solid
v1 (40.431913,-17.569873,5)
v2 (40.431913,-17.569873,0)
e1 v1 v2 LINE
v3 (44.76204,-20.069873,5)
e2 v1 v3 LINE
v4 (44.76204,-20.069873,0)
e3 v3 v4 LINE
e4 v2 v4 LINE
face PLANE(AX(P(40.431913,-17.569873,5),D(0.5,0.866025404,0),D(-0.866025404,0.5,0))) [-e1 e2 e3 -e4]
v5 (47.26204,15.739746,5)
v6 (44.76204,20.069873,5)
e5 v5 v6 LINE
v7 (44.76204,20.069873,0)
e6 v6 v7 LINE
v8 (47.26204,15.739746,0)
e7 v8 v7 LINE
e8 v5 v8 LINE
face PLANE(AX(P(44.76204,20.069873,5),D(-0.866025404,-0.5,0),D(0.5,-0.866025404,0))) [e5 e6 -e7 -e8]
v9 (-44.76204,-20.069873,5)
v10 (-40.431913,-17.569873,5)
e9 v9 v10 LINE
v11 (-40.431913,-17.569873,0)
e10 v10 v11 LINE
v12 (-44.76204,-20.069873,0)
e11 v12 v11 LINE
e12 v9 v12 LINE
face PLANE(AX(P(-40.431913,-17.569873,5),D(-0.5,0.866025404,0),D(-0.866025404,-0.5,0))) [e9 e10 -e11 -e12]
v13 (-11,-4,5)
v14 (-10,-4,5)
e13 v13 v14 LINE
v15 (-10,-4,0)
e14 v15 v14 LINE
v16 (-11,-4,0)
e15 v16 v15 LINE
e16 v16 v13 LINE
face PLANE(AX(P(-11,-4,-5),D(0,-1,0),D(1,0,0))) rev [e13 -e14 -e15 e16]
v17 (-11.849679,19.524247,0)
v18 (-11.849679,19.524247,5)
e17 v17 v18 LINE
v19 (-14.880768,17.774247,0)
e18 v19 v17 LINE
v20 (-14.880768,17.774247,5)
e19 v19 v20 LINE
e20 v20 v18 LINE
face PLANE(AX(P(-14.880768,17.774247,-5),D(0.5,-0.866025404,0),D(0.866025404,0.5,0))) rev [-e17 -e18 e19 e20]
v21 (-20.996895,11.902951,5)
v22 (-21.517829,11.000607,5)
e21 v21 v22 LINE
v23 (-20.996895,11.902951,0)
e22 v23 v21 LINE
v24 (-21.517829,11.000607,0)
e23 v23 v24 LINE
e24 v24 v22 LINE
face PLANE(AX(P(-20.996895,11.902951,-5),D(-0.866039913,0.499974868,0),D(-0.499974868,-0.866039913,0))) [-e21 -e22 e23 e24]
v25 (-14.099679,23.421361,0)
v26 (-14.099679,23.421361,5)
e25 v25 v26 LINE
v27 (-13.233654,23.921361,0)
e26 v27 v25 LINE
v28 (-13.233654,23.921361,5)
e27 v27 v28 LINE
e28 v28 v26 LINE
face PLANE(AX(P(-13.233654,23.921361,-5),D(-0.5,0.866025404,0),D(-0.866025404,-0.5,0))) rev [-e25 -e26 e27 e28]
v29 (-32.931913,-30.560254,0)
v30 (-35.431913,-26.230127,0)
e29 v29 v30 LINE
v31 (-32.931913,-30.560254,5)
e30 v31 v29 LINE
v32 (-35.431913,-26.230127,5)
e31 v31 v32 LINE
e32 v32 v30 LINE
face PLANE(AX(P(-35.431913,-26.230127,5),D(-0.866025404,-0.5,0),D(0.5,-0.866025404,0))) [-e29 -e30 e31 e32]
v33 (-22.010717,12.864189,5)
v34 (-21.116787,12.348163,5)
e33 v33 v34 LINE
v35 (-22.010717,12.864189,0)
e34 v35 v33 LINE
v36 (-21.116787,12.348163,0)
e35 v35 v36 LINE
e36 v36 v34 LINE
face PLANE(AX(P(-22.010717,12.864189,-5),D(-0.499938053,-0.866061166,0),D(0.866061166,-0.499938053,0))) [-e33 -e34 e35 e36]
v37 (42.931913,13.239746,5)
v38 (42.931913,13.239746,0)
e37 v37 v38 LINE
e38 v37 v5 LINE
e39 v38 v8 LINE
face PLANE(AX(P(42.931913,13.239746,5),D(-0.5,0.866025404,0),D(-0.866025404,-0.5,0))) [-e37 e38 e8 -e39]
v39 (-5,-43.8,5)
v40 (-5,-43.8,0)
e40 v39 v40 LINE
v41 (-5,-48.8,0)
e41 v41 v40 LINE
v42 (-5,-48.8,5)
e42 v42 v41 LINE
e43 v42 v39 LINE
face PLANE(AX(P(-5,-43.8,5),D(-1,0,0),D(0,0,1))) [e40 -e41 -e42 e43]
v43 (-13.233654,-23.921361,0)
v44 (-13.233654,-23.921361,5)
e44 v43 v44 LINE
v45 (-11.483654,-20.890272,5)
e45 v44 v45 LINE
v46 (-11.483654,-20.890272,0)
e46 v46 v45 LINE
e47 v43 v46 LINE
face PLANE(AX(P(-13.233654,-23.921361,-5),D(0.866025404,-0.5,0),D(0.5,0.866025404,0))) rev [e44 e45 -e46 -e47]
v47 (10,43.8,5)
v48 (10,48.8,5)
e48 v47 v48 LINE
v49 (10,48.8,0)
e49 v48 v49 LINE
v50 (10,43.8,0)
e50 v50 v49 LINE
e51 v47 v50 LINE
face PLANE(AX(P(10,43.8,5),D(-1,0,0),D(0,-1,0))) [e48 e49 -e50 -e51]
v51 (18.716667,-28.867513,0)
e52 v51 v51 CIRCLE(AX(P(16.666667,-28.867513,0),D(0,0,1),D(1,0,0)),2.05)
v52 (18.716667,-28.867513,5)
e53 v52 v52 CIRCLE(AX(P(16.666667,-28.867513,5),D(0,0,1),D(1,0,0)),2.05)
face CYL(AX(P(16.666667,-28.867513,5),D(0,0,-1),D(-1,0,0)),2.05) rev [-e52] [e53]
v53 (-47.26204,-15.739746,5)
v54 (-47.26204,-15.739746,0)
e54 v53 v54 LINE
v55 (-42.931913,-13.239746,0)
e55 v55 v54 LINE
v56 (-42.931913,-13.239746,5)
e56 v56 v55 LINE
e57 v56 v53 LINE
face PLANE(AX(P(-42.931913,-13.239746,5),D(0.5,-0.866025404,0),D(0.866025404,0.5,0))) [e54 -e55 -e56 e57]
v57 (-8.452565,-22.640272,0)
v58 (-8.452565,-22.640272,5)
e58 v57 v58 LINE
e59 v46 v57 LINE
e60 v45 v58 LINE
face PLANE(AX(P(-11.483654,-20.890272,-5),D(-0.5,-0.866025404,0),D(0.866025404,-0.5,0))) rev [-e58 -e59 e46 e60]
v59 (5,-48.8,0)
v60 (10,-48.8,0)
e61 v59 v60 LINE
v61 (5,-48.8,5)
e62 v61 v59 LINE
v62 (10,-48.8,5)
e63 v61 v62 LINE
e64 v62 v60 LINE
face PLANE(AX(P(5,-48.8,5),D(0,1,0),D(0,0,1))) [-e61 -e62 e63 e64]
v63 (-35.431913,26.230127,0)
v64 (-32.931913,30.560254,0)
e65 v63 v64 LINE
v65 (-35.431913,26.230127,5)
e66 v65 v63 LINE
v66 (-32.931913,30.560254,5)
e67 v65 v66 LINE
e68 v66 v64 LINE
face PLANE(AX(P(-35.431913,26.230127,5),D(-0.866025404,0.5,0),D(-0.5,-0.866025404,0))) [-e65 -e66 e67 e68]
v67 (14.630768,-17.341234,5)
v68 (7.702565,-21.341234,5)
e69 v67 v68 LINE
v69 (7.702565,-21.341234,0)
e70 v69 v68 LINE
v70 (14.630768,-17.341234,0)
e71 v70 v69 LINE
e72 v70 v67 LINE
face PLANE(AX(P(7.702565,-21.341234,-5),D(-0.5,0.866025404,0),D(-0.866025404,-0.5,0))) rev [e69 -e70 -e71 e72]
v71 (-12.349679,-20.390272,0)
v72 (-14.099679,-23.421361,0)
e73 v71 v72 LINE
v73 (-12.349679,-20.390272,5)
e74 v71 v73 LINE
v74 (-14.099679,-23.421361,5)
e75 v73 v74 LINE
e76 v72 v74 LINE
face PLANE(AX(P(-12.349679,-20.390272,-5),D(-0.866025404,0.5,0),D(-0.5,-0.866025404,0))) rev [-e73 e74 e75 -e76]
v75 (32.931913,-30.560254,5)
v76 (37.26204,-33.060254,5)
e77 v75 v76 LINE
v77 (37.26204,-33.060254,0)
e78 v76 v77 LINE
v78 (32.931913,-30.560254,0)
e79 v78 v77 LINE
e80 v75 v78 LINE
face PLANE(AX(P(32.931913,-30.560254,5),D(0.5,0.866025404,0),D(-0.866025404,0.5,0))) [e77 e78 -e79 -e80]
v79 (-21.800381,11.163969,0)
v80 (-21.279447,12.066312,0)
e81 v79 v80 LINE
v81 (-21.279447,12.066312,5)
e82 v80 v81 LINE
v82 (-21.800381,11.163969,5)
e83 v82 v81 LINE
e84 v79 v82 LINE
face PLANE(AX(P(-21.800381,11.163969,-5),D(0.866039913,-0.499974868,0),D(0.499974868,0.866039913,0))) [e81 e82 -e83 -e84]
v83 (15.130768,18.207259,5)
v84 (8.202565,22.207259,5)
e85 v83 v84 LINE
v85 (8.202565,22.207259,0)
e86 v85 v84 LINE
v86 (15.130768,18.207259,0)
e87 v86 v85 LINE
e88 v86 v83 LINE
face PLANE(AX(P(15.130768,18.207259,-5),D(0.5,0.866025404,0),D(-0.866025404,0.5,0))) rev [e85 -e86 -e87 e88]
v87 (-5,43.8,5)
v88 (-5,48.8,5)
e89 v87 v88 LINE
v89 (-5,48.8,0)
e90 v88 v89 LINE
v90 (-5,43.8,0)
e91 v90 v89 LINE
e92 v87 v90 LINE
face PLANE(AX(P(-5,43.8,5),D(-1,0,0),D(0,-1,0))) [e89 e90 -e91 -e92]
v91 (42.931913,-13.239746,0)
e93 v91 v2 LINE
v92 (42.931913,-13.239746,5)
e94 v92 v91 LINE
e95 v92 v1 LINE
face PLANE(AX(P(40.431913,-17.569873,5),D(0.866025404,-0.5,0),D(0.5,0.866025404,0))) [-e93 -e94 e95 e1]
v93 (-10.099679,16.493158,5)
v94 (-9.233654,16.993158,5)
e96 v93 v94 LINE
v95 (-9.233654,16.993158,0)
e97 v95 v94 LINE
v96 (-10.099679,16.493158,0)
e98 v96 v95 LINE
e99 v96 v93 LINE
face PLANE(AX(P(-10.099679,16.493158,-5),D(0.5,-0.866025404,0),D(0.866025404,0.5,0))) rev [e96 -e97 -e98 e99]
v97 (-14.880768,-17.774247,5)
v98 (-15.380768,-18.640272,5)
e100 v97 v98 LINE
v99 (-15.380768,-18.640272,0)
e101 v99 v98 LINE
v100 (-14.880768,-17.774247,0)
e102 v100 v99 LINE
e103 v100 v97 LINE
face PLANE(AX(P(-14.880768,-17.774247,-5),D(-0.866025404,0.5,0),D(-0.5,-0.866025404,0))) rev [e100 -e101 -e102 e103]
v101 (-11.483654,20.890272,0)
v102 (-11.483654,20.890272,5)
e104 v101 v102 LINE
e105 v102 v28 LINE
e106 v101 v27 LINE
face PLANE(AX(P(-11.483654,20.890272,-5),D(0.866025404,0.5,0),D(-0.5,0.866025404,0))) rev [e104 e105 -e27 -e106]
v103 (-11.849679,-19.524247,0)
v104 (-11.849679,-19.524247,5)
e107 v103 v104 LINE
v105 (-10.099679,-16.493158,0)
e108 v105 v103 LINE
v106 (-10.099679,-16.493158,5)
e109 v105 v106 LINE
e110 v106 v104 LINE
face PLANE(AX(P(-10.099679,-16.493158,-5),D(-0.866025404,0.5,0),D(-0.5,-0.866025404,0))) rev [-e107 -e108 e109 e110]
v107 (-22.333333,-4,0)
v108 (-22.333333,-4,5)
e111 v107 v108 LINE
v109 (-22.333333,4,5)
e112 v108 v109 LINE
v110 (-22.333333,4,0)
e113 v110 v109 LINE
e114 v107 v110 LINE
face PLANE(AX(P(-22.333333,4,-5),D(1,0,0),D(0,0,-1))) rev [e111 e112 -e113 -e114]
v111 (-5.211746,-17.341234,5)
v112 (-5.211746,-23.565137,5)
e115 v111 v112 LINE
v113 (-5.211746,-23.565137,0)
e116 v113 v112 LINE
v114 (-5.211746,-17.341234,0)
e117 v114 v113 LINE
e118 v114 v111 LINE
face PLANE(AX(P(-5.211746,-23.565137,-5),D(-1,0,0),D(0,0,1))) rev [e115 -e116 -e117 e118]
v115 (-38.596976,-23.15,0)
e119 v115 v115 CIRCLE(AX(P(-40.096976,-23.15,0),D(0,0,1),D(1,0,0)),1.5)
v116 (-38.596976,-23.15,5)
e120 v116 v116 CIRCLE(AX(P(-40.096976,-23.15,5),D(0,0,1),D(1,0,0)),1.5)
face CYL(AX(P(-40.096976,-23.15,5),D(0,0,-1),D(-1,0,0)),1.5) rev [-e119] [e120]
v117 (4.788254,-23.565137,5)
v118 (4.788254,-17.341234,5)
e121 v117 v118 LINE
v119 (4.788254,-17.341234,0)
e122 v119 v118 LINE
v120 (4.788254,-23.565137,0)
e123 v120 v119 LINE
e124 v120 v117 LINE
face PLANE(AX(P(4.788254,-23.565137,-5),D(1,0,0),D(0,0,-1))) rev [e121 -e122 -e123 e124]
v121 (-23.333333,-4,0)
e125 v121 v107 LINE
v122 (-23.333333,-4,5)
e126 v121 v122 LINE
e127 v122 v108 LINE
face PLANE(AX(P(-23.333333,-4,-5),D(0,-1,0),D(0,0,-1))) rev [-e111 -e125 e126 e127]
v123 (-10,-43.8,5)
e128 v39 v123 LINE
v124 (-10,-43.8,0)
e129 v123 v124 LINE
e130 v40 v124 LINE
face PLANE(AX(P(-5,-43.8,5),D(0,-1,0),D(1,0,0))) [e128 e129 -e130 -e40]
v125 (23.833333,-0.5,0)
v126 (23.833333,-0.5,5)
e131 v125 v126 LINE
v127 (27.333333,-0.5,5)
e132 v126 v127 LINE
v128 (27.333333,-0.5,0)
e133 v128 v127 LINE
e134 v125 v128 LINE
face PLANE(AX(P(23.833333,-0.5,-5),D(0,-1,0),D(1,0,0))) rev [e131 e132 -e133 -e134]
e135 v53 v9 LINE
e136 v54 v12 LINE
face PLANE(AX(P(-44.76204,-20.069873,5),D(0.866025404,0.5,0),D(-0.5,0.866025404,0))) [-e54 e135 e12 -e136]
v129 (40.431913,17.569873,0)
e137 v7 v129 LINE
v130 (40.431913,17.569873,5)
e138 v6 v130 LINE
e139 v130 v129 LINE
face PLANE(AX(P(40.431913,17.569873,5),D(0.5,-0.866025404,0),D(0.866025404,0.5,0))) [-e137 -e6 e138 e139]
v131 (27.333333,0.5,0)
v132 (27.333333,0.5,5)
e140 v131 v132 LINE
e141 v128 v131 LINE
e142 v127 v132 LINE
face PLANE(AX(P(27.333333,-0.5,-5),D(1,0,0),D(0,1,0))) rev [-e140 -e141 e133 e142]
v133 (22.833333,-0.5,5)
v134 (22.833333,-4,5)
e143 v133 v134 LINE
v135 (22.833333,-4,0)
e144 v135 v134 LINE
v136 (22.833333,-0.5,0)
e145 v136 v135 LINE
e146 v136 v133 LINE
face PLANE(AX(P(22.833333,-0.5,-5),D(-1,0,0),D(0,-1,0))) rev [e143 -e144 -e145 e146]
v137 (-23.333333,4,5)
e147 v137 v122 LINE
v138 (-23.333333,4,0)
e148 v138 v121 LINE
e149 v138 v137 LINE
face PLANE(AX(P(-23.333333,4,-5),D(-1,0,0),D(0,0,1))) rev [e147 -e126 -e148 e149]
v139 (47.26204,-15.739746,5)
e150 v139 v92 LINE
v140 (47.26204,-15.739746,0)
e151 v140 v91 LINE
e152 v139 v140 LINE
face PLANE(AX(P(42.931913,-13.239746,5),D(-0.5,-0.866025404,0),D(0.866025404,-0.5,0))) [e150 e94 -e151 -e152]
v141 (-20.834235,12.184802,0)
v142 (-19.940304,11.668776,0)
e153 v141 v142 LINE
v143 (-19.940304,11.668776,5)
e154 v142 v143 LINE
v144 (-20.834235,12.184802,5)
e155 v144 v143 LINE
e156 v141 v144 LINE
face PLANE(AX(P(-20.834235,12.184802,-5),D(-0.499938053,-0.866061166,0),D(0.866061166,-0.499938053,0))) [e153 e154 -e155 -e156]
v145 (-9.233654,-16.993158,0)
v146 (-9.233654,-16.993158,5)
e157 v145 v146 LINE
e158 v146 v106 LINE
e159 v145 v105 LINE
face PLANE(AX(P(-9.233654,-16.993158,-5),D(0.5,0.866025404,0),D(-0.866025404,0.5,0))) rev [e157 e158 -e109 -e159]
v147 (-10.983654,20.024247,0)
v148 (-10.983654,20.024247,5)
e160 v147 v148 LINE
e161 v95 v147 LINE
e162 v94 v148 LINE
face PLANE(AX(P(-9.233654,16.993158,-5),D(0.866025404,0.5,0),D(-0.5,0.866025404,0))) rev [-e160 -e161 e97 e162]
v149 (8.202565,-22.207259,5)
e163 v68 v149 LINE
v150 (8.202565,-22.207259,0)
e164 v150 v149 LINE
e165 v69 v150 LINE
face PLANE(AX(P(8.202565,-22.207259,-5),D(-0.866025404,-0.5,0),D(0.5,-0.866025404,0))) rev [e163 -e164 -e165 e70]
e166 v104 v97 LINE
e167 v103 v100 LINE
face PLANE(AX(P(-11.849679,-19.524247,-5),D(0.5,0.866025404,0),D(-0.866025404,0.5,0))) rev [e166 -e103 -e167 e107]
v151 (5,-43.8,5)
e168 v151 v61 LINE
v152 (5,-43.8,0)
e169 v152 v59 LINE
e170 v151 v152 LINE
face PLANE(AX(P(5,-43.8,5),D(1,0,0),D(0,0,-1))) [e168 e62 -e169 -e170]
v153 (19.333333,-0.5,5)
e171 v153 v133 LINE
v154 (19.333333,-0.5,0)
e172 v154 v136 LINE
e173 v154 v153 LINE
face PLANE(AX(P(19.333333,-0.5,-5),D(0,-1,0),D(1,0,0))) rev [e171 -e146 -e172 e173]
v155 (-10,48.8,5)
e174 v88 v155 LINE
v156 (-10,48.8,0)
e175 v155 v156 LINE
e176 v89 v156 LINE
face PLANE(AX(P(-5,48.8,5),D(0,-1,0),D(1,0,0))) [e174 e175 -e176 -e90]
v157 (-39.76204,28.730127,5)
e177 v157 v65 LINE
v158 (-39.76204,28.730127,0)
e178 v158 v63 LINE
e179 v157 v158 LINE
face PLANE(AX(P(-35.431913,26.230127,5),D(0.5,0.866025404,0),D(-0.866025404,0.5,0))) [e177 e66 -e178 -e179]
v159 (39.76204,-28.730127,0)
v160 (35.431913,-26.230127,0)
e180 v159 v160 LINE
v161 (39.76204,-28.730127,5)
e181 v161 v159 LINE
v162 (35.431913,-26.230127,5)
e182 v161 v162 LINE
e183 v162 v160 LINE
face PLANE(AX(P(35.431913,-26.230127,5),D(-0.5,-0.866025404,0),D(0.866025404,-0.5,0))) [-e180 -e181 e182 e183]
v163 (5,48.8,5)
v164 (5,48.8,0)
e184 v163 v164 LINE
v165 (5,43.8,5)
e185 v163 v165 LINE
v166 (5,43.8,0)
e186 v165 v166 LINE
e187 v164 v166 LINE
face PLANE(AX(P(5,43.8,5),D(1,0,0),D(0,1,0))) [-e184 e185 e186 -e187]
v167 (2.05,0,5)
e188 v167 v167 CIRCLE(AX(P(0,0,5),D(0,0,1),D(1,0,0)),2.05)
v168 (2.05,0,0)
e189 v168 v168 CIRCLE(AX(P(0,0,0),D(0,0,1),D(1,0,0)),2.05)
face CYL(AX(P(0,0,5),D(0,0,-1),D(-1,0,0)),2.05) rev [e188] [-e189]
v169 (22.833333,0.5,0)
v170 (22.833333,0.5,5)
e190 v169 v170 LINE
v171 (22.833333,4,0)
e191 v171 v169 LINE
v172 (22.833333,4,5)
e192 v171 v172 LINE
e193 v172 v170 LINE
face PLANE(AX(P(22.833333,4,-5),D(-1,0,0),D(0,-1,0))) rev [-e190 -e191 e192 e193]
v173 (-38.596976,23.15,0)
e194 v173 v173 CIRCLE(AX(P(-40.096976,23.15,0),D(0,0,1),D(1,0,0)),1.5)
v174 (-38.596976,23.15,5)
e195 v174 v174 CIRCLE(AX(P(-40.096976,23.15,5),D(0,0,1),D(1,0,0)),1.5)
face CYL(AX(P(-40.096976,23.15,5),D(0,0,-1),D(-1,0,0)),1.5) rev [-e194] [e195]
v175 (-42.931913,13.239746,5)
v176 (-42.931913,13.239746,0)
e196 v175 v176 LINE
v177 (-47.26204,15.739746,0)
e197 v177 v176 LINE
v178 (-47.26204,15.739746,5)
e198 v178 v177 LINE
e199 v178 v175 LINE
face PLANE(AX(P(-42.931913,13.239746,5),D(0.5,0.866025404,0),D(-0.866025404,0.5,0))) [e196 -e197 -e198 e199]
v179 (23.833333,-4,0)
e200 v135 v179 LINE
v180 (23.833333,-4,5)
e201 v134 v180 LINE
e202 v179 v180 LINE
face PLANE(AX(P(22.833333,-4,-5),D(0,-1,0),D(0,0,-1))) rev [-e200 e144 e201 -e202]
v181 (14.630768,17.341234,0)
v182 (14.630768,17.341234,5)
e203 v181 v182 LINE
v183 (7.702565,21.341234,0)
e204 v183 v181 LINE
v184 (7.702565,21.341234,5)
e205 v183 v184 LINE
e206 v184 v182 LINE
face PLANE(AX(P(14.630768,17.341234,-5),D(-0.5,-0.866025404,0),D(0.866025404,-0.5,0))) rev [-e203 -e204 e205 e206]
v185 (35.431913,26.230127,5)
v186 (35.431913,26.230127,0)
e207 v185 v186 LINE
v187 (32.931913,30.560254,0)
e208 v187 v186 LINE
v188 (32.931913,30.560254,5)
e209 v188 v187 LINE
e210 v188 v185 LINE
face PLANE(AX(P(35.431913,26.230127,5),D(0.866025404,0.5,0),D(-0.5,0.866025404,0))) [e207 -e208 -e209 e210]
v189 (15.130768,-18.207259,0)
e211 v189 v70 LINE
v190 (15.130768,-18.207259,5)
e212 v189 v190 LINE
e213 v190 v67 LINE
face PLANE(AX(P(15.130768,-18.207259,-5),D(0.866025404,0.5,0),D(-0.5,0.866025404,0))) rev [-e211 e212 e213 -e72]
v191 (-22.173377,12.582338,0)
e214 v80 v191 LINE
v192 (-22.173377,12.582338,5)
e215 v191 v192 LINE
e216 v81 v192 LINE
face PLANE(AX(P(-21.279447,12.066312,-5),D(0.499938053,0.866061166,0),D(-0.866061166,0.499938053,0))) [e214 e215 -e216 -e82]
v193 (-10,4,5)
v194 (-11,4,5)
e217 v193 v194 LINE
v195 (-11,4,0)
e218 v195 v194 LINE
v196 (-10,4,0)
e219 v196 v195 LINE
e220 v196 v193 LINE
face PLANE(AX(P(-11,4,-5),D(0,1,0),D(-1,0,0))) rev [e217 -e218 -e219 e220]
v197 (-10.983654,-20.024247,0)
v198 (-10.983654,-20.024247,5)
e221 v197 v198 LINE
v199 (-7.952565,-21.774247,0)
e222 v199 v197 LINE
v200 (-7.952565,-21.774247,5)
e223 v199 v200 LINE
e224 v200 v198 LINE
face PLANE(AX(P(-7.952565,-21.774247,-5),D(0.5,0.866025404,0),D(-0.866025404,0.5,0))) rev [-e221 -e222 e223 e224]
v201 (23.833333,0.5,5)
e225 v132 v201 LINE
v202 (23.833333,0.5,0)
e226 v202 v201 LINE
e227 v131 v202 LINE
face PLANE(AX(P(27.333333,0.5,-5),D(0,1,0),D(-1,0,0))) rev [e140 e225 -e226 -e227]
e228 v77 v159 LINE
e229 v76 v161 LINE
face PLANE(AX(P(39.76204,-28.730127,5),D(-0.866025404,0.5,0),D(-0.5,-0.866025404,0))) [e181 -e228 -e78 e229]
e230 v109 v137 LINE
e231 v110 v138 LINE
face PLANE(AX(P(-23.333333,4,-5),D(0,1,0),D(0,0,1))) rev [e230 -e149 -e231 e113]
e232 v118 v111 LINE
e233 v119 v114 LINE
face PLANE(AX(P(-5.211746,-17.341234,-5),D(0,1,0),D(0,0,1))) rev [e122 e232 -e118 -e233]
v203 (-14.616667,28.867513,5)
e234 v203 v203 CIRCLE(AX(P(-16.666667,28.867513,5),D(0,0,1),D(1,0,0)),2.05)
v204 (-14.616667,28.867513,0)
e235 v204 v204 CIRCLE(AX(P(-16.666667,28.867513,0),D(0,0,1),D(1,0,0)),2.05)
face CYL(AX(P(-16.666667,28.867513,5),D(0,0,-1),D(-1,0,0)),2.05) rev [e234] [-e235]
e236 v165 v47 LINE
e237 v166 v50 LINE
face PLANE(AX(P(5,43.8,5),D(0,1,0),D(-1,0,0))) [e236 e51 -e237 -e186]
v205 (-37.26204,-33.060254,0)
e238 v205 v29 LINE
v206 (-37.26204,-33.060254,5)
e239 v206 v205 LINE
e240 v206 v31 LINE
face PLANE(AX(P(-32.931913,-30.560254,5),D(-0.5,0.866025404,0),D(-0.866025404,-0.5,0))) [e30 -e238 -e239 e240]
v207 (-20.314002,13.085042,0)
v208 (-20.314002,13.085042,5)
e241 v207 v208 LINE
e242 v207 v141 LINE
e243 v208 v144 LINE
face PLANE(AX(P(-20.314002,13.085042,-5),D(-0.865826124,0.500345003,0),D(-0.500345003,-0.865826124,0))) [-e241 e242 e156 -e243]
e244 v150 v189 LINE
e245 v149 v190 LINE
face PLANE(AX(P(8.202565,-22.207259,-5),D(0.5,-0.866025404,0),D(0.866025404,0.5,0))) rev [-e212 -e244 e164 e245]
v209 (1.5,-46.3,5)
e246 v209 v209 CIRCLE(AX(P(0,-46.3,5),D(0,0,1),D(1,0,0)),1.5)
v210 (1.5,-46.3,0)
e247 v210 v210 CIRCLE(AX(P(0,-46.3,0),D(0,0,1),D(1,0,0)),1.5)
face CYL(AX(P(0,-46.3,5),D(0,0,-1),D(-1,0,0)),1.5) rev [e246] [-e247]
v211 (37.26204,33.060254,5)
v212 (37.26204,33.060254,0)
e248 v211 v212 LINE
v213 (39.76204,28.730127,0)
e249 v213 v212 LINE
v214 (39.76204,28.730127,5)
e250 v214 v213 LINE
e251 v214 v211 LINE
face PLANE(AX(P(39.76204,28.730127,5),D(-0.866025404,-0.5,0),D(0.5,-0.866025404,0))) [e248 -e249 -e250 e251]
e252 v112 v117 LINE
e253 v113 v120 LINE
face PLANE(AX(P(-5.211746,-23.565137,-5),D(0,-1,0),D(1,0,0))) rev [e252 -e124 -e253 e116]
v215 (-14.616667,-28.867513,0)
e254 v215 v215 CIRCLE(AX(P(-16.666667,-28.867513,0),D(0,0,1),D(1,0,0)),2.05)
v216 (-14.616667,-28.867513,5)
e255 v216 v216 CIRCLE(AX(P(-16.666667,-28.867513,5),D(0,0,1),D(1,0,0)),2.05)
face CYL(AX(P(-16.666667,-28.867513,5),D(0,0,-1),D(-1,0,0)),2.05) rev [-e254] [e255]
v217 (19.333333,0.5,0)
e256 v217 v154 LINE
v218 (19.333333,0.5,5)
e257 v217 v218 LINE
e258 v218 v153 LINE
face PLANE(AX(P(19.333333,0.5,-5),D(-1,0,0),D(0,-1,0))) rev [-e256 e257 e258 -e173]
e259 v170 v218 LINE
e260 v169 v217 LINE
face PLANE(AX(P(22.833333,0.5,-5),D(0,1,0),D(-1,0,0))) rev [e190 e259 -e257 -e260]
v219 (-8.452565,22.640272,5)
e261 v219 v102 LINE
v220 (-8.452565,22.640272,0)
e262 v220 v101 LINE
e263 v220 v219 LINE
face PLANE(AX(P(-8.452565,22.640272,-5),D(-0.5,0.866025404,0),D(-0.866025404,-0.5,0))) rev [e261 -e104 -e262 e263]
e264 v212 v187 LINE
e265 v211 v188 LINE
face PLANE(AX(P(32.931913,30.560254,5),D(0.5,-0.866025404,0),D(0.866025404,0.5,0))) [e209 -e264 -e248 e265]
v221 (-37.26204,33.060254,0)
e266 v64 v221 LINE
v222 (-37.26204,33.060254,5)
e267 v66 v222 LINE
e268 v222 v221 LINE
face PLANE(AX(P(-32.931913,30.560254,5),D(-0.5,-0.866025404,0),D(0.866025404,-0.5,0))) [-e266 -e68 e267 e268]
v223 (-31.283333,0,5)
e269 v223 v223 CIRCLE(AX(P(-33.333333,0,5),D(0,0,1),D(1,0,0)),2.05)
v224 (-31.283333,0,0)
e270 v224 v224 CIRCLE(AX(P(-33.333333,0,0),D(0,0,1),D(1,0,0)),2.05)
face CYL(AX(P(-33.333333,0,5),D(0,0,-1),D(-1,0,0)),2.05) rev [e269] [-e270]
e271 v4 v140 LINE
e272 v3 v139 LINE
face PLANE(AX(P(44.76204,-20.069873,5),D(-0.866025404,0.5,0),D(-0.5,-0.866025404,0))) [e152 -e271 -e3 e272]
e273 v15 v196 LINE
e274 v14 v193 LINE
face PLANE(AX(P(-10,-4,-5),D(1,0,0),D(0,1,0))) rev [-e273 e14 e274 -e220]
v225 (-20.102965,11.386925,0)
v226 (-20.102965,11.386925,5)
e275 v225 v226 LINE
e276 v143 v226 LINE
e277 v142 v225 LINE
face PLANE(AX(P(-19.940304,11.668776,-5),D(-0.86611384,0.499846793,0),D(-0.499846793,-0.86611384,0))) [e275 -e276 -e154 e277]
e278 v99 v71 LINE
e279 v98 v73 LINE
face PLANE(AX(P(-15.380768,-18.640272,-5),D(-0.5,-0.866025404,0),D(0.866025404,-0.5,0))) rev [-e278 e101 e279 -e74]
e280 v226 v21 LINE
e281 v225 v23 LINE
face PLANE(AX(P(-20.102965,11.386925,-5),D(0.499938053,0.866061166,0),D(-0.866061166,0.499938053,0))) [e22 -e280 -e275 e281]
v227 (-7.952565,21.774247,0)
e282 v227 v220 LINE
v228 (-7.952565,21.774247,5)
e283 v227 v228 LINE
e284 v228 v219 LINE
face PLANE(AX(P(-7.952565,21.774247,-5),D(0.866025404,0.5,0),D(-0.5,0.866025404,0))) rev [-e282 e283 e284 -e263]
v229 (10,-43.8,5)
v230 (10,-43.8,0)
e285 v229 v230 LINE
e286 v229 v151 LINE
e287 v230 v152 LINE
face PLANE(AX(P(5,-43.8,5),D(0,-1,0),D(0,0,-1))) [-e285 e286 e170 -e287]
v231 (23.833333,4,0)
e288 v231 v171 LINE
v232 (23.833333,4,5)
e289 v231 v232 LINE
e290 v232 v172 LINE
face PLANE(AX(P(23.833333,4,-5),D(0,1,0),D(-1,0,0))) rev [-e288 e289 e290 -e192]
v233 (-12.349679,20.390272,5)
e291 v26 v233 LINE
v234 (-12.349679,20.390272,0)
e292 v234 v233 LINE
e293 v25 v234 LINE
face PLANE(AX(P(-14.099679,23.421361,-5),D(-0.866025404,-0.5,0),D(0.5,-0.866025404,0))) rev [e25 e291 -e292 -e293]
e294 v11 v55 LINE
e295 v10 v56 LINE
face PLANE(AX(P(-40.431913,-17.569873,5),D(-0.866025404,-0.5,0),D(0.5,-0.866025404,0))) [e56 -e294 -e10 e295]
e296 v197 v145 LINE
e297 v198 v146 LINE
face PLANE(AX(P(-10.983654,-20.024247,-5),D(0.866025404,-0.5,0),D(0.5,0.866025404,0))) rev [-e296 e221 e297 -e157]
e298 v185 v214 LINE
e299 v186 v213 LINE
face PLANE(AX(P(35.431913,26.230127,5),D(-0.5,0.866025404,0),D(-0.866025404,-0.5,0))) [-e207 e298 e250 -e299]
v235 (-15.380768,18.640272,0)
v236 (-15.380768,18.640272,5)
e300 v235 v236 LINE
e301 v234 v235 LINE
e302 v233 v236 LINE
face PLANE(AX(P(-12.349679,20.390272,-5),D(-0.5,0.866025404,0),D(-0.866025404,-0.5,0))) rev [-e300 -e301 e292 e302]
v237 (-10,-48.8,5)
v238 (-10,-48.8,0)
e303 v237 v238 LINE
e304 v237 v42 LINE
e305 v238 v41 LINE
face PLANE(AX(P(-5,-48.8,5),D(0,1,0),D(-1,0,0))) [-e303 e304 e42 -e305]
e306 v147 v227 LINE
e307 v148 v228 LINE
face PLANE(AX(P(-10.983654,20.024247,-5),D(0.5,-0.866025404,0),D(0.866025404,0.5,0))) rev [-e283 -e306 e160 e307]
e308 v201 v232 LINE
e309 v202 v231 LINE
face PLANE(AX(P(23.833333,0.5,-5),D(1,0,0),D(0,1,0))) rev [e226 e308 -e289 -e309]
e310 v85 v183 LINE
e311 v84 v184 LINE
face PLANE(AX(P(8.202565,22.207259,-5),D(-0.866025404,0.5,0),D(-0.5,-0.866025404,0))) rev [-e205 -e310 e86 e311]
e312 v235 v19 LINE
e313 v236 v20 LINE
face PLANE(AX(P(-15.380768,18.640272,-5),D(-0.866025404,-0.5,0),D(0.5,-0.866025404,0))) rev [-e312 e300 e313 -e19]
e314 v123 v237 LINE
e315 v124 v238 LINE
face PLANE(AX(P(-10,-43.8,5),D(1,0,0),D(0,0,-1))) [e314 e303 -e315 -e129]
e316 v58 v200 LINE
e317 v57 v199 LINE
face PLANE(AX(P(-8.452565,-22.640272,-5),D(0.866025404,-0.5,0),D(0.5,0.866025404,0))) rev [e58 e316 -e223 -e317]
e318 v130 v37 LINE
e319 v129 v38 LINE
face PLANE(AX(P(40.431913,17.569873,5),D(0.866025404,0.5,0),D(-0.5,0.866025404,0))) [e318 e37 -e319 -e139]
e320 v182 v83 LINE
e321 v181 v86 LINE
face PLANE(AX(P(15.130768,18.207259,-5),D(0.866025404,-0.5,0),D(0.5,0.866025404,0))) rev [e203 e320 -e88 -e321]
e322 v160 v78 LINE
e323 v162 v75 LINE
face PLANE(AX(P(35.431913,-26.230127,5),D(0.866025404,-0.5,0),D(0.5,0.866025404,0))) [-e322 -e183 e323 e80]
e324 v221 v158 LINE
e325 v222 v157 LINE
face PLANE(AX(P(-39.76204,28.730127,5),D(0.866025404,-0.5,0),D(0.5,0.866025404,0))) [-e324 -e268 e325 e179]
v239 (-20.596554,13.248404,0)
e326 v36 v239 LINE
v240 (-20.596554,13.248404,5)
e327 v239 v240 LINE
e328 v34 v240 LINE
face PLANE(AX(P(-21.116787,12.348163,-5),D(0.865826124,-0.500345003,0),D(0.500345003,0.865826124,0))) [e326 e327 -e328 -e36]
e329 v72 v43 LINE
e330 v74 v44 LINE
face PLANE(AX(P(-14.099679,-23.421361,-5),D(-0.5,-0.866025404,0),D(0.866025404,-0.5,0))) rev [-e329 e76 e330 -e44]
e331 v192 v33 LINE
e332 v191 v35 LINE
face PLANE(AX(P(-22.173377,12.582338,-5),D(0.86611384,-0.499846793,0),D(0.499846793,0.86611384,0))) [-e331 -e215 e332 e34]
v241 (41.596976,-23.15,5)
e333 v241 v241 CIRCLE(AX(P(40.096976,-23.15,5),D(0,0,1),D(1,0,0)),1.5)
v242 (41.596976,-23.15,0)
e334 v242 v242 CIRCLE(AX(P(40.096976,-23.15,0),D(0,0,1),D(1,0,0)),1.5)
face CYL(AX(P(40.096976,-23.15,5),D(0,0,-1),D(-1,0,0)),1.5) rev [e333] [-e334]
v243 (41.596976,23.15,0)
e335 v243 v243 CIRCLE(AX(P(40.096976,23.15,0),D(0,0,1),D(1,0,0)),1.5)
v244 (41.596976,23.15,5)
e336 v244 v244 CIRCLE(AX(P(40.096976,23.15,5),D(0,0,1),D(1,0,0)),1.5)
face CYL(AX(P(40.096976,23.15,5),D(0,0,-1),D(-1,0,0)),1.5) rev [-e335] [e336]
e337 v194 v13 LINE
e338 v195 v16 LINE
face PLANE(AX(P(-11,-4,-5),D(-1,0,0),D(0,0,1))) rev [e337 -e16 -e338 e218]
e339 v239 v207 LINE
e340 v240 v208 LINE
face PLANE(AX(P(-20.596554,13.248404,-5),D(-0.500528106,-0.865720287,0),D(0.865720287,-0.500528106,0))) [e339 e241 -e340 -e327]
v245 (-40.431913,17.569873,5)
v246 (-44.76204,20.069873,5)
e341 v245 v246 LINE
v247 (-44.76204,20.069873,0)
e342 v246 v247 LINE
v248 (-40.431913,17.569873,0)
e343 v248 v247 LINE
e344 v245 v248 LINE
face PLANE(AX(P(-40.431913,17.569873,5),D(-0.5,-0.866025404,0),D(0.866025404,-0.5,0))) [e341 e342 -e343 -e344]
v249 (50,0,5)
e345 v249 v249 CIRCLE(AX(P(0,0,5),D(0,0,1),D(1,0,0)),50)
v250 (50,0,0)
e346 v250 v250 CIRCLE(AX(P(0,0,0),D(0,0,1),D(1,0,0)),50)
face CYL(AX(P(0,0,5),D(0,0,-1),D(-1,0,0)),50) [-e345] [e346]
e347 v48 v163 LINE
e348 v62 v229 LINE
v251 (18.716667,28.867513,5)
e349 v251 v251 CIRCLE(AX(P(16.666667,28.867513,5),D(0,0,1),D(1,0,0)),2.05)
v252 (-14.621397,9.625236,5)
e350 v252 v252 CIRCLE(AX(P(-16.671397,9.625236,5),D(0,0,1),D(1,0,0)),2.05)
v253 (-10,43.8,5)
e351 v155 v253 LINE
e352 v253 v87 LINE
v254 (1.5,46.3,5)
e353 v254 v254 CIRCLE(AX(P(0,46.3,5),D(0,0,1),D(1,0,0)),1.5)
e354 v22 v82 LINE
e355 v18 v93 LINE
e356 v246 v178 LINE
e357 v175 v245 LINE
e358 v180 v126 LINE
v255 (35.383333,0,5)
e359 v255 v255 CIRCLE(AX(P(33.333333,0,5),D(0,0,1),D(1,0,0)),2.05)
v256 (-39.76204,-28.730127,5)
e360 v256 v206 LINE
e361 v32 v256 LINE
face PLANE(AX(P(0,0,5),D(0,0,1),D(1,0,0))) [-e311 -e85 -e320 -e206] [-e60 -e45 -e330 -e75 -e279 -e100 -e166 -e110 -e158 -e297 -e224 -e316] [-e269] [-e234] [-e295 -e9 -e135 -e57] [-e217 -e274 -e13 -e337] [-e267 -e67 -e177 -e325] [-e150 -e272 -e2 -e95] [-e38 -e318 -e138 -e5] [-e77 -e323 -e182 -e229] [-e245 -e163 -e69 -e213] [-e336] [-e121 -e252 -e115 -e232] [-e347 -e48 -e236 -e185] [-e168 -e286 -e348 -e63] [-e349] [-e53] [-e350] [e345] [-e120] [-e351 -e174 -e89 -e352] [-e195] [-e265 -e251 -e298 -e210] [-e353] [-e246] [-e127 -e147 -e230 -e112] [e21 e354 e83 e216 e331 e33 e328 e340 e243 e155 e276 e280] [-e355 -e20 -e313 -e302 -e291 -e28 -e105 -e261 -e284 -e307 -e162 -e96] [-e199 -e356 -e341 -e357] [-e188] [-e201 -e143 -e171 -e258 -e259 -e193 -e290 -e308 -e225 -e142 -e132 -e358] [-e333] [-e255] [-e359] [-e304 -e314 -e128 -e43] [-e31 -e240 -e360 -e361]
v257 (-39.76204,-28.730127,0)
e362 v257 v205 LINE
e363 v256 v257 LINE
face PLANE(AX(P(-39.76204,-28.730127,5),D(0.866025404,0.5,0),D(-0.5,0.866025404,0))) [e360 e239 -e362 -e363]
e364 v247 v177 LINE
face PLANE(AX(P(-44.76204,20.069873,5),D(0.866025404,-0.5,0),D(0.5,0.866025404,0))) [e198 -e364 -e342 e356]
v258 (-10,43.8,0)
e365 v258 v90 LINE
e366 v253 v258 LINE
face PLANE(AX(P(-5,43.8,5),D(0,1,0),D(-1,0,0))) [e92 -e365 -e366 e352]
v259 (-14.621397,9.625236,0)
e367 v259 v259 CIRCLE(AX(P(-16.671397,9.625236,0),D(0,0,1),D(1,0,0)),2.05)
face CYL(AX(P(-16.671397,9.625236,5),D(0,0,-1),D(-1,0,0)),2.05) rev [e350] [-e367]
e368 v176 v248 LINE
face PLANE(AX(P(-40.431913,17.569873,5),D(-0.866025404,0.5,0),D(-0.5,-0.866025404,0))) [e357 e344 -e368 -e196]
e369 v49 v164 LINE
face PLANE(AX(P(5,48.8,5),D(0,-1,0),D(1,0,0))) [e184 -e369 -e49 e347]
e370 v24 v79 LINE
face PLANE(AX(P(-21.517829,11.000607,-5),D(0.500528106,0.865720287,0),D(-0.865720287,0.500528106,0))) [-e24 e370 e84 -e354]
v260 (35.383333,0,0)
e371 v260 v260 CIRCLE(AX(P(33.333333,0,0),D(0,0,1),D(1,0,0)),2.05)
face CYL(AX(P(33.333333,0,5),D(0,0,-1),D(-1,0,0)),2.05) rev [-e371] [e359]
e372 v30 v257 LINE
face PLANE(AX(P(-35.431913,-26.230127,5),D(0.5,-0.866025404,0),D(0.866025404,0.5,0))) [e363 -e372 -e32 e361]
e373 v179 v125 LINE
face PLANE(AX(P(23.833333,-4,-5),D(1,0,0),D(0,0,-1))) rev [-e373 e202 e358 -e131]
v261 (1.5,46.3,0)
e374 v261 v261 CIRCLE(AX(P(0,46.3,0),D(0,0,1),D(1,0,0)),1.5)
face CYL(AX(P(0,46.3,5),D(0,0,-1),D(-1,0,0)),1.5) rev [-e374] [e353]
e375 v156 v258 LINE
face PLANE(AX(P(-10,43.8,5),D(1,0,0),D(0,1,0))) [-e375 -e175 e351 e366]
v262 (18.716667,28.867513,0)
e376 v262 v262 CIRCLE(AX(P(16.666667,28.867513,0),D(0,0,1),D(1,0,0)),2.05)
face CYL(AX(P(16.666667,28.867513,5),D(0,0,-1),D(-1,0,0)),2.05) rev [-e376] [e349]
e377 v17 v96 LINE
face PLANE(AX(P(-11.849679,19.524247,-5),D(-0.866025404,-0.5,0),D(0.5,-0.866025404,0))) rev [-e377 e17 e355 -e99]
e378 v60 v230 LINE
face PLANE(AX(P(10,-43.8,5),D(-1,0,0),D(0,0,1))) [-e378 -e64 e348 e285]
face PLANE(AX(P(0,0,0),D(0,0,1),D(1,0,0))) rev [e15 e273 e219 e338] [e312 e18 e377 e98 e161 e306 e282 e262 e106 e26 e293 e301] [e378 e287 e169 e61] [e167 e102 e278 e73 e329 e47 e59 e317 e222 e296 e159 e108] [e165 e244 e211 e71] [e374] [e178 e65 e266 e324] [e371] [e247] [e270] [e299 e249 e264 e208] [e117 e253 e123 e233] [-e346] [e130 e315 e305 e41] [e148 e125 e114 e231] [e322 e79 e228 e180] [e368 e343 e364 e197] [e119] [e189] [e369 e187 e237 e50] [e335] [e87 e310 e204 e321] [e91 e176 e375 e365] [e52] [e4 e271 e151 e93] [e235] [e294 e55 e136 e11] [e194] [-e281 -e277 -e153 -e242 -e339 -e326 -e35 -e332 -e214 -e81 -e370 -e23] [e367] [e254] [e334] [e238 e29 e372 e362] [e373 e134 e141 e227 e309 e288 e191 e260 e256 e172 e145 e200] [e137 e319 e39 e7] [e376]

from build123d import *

# Parameters (mm, degrees)
BOSS_EXTRU_1_OUTLINE_R   = 50
BOSS_EXTRU_1_OUTLINE_W   = 5
BOSS_EXTRU_1_OUTLINE_H   = 5
BOSS_EXTRU_1_OUTLINE_R_2 = 2.05
BOSS_EXTRU_1_OUTLINE_R_3 = 1.5
BOSS_EXTRU_1_DEPTH       = 5
SKETCH3_W                = 1
SKETCH3_H                = 8
SKETCH3_W_2              = 10
SKETCH3_H_2              = 6.223903135
CUT_EXTRUDE2_DEPTH       = 10


# Read off the part's stored shape, not the designer's step: Boss.-Extru.1
with BuildPart() as part:
    # Boss.-Extru.1 outline → Boss.-Extru.1 (new body)
    with BuildSketch(Plane.XY):
        Circle(BOSS_EXTRU_1_OUTLINE_R)
        Polygon((-37.262039705, -33.060254038), (-39.762039705, -28.730127019), (-35.431912686, -26.230127019), (-32.931912686, -30.560254038), align=None, mode=Mode.SUBTRACT)
        with Locations((-7.5, -46.3)):
            Rectangle(BOSS_EXTRU_1_OUTLINE_W, BOSS_EXTRU_1_OUTLINE_H, mode=Mode.SUBTRACT)
        with Locations((-16.666666667, -28.867513459)):
            Circle(BOSS_EXTRU_1_OUTLINE_R_2, mode=Mode.SUBTRACT)
        with Locations((-40.096976195, -23.15)):
            Circle(BOSS_EXTRU_1_OUTLINE_R_3, mode=Mode.SUBTRACT)
        Polygon((-42.931912686, -13.239745962), (-40.431912686, -17.569872981), (-44.762039705, -20.069872981), (-47.262039705, -15.739745962), align=None, mode=Mode.SUBTRACT)
        with Locations((0, -46.3)):
            Circle(BOSS_EXTRU_1_OUTLINE_R_3, mode=Mode.SUBTRACT)
        with Locations((7.5, -46.3)):
            Rectangle(BOSS_EXTRU_1_OUTLINE_W, BOSS_EXTRU_1_OUTLINE_H, mode=Mode.SUBTRACT)
        with Locations((16.666666667, -28.867513459)):
            Circle(BOSS_EXTRU_1_OUTLINE_R_2, mode=Mode.SUBTRACT)
        Polygon((32.931912686, -30.560254038), (35.431912686, -26.230127019), (39.762039705, -28.730127019), (37.262039705, -33.060254038), align=None, mode=Mode.SUBTRACT)
        with Locations((40.096976195, -23.15)):
            Circle(BOSS_EXTRU_1_OUTLINE_R_3, mode=Mode.SUBTRACT)
        Polygon((47.262039705, -15.739745962), (44.762039705, -20.069872981), (40.431912686, -17.569872981), (42.931912686, -13.239745962), align=None, mode=Mode.SUBTRACT)
        with Locations((-33.333333333, 0)):
            Circle(BOSS_EXTRU_1_OUTLINE_R_2, mode=Mode.SUBTRACT)
        Polygon((-47.262039705, 15.739745962), (-44.762039705, 20.069872981), (-40.431912686, 17.569872981), (-42.931912686, 13.239745962), align=None, mode=Mode.SUBTRACT)
        with Locations((-40.096976195, 23.15)):
            Circle(BOSS_EXTRU_1_OUTLINE_R_3, mode=Mode.SUBTRACT)
        with Locations((-16.671397032, 9.625235564)):
            Circle(BOSS_EXTRU_1_OUTLINE_R_2, mode=Mode.SUBTRACT)
        Polygon((-32.931912686, 30.560254038), (-35.431912686, 26.230127019), (-39.762039705, 28.730127019), (-37.262039705, 33.060254038), align=None, mode=Mode.SUBTRACT)
        with Locations((-16.666666667, 28.867513459)):
            Circle(BOSS_EXTRU_1_OUTLINE_R_2, mode=Mode.SUBTRACT)
        with Locations((-7.5, 46.3)):
            Rectangle(BOSS_EXTRU_1_OUTLINE_W, BOSS_EXTRU_1_OUTLINE_H, mode=Mode.SUBTRACT)
        Circle(BOSS_EXTRU_1_OUTLINE_R_2, mode=Mode.SUBTRACT)
        with Locations((33.333333333, 0)):
            Circle(BOSS_EXTRU_1_OUTLINE_R_2, mode=Mode.SUBTRACT)
        Polygon((42.931912686, 13.239745962), (40.431912686, 17.569872981), (44.762039705, 20.069872981), (47.262039705, 15.739745962), align=None, mode=Mode.SUBTRACT)
        with Locations((40.096976195, 23.15)):
            Circle(BOSS_EXTRU_1_OUTLINE_R_3, mode=Mode.SUBTRACT)
        with Locations((16.666666667, 28.867513459)):
            Circle(BOSS_EXTRU_1_OUTLINE_R_2, mode=Mode.SUBTRACT)
        with Locations((0, 46.3)):
            Circle(BOSS_EXTRU_1_OUTLINE_R_3, mode=Mode.SUBTRACT)
        with Locations((7.5, 46.3)):
            Rectangle(BOSS_EXTRU_1_OUTLINE_W, BOSS_EXTRU_1_OUTLINE_H, mode=Mode.SUBTRACT)
        Polygon((37.262039705, 33.060254038), (39.762039705, 28.730127019), (35.431912686, 26.230127019), (32.931912686, 30.560254038), align=None, mode=Mode.SUBTRACT)
    extrude(amount=BOSS_EXTRU_1_DEPTH)

    # Sketch3 → Cut-Extrude2 (cut)
    with BuildSketch(Plane.XY.offset(5)):
        with Locations((-10.5, 0)):
            Rectangle(SKETCH3_W, SKETCH3_H)
        with Locations((-22.833333333, 0)):
            Rectangle(SKETCH3_W, SKETCH3_H)
        Polygon((-13.233653965, 23.921361037), (-14.099679369, 23.421361037), (-12.349679369, 20.390272124), (-15.380768282, 18.640272124), (-14.880768282, 17.77424672), (-11.849679369, 19.52424672), (-10.099679369, 16.493157806), (-9.233653965, 16.993157806), (-10.983653965, 20.02424672), (-7.952565052, 21.77424672), (-8.452565052, 22.640272124), (-11.483653965, 20.890272124), align=None)
        Polygon((15.130768282, 18.207259422), (14.630768282, 17.341234018), (7.702565052, 21.341234018), (8.202565052, 22.207259422), align=None)
        Polygon((8.202565052, -22.207259422), (7.702565052, -21.341234018), (14.630768282, -17.341234018), (15.130768282, -18.207259422), align=None)
        Polygon((27.333333333, -0.5), (27.333333333, 0.5), (23.833333333, 0.5), (23.833333333, 4), (22.833333333, 4), (22.833333333, 0.5), (19.333333333, 0.5), (19.333333333, -0.5), (22.833333333, -0.5), (22.833333333, -4), (23.833333333, -4), (23.833333333, -0.5), align=None)
        Polygon((-14.099679369, -23.421361037), (-13.233653965, -23.921361037), (-11.483653965, -20.890272124), (-8.452565052, -22.640272124), (-7.952565052, -21.77424672), (-10.983653965, -20.02424672), (-9.233653965, -16.993157806), (-10.099679369, -16.493157806), (-11.849679369, -19.52424672), (-14.880768282, -17.77424672), (-15.380768282, -18.640272124), (-12.349679369, -20.390272124), align=None)
        with Locations((-0.211745945, -20.453185586)):
            Rectangle(SKETCH3_W_2, SKETCH3_H_2)
        Polygon((-20.834234776, 12.184801987), (-19.940304487, 11.668776346), (-20.102964744, 11.386925384), (-20.996895032, 11.902951025), (-21.517828526, 11.000607275), (-21.800380609, 11.163968654), (-21.279447115, 12.066312404), (-22.173377404, 12.582338045), (-22.010717147, 12.864189006), (-21.116786859, 12.348163365), (-20.596554487, 13.24840375), (-20.314002404, 13.085042371), align=None)
    extrude(amount=-CUT_EXTRUDE2_DEPTH, mode=Mode.SUBTRACT)


solid = part.part
